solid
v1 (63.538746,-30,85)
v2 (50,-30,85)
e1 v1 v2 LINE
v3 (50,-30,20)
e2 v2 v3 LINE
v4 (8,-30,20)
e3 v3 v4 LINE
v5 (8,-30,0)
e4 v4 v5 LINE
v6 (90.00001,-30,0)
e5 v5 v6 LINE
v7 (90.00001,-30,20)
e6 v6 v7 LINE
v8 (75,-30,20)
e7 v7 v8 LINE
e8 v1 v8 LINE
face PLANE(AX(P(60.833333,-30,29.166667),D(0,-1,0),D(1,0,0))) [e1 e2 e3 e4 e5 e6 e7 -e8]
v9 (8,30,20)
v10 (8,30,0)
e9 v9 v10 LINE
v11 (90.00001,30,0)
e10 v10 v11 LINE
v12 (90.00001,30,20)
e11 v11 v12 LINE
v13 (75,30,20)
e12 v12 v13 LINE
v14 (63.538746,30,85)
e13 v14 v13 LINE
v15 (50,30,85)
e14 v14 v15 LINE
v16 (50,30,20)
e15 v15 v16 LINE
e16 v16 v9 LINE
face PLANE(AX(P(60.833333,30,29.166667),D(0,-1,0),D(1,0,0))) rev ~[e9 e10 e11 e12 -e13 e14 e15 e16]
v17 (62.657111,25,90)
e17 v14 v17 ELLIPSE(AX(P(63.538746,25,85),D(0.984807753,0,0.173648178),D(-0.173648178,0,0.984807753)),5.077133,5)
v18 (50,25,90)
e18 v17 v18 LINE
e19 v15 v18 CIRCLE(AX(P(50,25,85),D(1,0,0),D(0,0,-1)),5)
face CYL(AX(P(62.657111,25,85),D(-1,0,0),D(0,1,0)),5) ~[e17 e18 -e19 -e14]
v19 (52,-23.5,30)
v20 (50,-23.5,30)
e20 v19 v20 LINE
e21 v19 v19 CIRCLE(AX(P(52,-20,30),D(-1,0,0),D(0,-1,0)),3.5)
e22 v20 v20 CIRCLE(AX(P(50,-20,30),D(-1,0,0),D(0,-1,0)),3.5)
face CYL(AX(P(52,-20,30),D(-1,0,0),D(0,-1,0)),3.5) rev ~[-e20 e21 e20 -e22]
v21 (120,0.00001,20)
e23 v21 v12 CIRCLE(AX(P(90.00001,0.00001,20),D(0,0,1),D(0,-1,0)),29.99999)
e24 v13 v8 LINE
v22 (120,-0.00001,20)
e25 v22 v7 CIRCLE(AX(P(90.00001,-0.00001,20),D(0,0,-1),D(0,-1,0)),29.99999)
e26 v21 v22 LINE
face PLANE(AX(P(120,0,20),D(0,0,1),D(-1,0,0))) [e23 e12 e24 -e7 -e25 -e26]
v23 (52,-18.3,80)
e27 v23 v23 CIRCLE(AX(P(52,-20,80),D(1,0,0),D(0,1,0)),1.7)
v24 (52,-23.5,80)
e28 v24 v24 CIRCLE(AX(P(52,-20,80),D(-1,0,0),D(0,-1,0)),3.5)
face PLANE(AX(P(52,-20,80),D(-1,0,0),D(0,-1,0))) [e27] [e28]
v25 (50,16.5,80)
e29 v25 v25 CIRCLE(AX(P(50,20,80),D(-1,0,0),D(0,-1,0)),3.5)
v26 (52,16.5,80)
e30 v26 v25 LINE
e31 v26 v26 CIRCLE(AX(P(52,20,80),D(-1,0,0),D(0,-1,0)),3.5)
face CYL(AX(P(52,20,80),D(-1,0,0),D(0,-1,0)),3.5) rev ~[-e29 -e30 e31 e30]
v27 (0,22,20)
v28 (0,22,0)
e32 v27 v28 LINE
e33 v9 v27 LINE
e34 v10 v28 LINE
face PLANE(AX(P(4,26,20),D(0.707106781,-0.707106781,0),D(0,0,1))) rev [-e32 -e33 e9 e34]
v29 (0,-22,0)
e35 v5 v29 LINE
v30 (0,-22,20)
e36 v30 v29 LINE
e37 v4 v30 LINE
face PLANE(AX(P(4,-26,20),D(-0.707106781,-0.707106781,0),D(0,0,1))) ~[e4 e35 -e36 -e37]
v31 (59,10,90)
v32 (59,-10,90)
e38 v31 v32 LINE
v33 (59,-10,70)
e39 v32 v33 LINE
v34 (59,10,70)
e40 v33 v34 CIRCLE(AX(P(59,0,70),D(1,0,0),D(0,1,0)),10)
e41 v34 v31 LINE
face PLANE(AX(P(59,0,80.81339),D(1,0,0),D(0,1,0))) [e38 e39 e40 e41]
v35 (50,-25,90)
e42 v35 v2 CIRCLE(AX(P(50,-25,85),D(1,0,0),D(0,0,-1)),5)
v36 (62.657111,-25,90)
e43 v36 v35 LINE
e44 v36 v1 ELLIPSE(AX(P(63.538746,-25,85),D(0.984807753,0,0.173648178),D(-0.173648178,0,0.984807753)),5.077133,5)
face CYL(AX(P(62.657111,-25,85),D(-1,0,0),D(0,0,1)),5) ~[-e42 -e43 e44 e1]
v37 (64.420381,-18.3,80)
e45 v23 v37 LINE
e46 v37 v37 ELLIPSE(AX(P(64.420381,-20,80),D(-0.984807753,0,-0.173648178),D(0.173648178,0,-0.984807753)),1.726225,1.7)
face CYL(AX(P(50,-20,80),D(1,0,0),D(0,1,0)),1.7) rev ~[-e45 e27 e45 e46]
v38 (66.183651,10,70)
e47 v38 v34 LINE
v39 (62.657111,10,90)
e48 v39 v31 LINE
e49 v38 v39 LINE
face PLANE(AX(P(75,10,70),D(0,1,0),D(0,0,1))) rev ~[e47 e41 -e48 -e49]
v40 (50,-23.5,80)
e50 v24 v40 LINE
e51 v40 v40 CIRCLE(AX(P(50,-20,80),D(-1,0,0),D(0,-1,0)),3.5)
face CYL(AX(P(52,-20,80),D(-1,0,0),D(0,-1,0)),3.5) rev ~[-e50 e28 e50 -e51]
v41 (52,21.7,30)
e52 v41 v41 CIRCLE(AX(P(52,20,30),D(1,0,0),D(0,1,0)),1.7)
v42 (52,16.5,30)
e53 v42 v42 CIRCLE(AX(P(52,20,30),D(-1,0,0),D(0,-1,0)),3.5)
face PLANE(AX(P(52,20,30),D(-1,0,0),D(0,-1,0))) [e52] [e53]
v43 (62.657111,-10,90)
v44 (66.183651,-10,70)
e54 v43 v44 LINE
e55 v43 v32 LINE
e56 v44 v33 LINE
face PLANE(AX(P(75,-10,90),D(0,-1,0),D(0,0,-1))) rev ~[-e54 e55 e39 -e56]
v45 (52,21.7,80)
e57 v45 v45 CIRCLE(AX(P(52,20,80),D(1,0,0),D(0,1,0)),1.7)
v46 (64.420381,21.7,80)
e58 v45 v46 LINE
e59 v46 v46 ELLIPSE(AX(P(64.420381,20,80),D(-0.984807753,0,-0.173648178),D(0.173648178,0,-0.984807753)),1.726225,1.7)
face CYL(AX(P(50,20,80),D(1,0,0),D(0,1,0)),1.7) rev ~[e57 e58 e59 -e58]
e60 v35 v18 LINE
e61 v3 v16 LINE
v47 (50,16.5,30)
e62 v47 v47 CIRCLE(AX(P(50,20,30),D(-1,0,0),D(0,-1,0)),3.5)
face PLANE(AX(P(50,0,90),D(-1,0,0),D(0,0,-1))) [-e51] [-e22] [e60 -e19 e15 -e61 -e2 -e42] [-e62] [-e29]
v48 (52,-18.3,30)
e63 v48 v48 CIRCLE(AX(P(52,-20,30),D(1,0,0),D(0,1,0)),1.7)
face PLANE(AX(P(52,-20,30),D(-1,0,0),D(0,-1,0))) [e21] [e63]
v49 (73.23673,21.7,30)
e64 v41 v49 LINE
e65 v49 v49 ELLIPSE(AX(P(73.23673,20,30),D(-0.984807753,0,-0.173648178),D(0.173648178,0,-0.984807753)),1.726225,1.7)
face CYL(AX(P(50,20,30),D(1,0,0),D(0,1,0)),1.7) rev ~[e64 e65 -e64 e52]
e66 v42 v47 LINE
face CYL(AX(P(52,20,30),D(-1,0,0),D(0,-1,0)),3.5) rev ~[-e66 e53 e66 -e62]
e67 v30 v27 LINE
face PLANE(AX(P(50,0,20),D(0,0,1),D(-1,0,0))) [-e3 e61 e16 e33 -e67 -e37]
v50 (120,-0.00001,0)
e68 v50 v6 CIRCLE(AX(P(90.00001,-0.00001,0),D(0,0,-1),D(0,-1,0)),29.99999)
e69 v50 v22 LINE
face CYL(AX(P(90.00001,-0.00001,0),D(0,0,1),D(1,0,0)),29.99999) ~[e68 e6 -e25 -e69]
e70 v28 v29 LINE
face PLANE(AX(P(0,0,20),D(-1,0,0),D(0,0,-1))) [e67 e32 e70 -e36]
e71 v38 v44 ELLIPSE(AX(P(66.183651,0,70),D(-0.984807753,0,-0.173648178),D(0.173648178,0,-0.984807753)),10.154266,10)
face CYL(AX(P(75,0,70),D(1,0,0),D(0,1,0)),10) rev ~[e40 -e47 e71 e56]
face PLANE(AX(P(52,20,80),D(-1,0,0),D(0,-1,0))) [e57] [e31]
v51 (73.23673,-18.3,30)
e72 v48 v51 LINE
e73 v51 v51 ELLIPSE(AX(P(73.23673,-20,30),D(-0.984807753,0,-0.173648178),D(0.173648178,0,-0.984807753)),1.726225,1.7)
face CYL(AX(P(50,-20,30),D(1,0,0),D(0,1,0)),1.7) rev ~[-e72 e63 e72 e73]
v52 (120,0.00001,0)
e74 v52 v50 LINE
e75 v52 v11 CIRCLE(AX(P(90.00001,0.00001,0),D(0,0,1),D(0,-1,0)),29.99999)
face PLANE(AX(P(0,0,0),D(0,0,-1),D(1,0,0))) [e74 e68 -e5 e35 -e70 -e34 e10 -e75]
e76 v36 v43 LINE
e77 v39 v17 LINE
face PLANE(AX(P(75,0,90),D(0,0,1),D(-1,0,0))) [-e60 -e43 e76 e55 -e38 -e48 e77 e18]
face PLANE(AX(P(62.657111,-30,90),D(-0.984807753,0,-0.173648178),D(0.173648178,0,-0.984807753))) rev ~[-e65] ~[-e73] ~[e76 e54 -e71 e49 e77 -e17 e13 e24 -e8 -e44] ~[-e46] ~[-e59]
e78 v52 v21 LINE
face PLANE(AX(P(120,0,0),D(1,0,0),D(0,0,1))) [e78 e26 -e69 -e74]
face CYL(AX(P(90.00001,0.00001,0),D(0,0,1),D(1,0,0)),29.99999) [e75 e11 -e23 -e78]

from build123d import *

# Parameters (mm, degrees)
F1_DEPTH       = 30
F2_R           = 29.99999
F4_D           = 3.4
F4_CBORE_D     = 7
F4_CBORE_DEPTH = 2
F5_SIZE        = 8
F10_DEPTH      = 16
F11_DEPTH      = 60.001
F12_R          = 5


# Not quite as in the source:
# - a fillet or chamfer is up to 0.001 mm smaller than in the source, because OpenCascade refuses the exact size


with BuildPart() as f1:
    # F0 (on Front) → F1 (new body, symmetric)
    with BuildSketch(Plane.XZ):
        Polygon((0, 20), (0, 0), (120, 0), (120, 20), (75, 20), (75, 90), (50, 90), (50, 20), align=None)
    extrude(amount=F1_DEPTH, both=True)

    # F2 (radius 30 in the source; OpenCascade refuses exactly that, so slightly less here)
    f2_edges = [f1.edges().sort_by_distance(p)[0] for p in [
        (120, -30, 10),
        (120, 30, 10),
    ]]
    fillet(f2_edges, radius=F2_R)

    # F4 (through all)
    with Locations(Plane(origin=(50, 0, 0), x_dir=(0, -1, 0), z_dir=(-1, 0, 0))):
        with Locations((-20, 80), (-20, 30), (20, 30), (20, 80)):
            CounterBoreHole(F4_D / 2, F4_CBORE_D / 2, F4_CBORE_DEPTH)

    # F5
    f5_edges = [f1.edges().sort_by_distance(p)[0] for p in [
        (0, 30, 10),
        (0, -30, 10),
    ]]
    chamfer(f5_edges, length=F5_SIZE)

    # F7 (on face) → F10 (cut, through all)
    with BuildSketch(Plane.YZ.offset(75)):
        with BuildLine():
            ThreePointArc((-10, 70), (0, 80), (10, 70))
            Line((10, 70), (10, 90))
            Line((10, 90), (-10, 90))
            Line((-10, 90), (-10, 70))
        make_face()
        with BuildLine():
            ThreePointArc((-10, 70), (0, 60), (10, 70))
            ThreePointArc((10, 70), (0, 80), (-10, 70))
        make_face()
    extrude(amount=-F10_DEPTH, mode=Mode.SUBTRACT)

    # F6 (on face) → F11 (cut, through all)
    with BuildSketch(Plane.XZ.offset(30)):
        Polygon((62.6571113504, 90), (75, 20), (75, 90), align=None)
    extrude(amount=-F11_DEPTH, mode=Mode.SUBTRACT)

    # F12
    f12_edges = [f1.edges().sort_by_distance(p)[0] for p in [
        (56.328556, -30, 90),
        (56.328556, 30, 90),
    ]]
    fillet(f12_edges, radius=F12_R)


solid = f1.part
